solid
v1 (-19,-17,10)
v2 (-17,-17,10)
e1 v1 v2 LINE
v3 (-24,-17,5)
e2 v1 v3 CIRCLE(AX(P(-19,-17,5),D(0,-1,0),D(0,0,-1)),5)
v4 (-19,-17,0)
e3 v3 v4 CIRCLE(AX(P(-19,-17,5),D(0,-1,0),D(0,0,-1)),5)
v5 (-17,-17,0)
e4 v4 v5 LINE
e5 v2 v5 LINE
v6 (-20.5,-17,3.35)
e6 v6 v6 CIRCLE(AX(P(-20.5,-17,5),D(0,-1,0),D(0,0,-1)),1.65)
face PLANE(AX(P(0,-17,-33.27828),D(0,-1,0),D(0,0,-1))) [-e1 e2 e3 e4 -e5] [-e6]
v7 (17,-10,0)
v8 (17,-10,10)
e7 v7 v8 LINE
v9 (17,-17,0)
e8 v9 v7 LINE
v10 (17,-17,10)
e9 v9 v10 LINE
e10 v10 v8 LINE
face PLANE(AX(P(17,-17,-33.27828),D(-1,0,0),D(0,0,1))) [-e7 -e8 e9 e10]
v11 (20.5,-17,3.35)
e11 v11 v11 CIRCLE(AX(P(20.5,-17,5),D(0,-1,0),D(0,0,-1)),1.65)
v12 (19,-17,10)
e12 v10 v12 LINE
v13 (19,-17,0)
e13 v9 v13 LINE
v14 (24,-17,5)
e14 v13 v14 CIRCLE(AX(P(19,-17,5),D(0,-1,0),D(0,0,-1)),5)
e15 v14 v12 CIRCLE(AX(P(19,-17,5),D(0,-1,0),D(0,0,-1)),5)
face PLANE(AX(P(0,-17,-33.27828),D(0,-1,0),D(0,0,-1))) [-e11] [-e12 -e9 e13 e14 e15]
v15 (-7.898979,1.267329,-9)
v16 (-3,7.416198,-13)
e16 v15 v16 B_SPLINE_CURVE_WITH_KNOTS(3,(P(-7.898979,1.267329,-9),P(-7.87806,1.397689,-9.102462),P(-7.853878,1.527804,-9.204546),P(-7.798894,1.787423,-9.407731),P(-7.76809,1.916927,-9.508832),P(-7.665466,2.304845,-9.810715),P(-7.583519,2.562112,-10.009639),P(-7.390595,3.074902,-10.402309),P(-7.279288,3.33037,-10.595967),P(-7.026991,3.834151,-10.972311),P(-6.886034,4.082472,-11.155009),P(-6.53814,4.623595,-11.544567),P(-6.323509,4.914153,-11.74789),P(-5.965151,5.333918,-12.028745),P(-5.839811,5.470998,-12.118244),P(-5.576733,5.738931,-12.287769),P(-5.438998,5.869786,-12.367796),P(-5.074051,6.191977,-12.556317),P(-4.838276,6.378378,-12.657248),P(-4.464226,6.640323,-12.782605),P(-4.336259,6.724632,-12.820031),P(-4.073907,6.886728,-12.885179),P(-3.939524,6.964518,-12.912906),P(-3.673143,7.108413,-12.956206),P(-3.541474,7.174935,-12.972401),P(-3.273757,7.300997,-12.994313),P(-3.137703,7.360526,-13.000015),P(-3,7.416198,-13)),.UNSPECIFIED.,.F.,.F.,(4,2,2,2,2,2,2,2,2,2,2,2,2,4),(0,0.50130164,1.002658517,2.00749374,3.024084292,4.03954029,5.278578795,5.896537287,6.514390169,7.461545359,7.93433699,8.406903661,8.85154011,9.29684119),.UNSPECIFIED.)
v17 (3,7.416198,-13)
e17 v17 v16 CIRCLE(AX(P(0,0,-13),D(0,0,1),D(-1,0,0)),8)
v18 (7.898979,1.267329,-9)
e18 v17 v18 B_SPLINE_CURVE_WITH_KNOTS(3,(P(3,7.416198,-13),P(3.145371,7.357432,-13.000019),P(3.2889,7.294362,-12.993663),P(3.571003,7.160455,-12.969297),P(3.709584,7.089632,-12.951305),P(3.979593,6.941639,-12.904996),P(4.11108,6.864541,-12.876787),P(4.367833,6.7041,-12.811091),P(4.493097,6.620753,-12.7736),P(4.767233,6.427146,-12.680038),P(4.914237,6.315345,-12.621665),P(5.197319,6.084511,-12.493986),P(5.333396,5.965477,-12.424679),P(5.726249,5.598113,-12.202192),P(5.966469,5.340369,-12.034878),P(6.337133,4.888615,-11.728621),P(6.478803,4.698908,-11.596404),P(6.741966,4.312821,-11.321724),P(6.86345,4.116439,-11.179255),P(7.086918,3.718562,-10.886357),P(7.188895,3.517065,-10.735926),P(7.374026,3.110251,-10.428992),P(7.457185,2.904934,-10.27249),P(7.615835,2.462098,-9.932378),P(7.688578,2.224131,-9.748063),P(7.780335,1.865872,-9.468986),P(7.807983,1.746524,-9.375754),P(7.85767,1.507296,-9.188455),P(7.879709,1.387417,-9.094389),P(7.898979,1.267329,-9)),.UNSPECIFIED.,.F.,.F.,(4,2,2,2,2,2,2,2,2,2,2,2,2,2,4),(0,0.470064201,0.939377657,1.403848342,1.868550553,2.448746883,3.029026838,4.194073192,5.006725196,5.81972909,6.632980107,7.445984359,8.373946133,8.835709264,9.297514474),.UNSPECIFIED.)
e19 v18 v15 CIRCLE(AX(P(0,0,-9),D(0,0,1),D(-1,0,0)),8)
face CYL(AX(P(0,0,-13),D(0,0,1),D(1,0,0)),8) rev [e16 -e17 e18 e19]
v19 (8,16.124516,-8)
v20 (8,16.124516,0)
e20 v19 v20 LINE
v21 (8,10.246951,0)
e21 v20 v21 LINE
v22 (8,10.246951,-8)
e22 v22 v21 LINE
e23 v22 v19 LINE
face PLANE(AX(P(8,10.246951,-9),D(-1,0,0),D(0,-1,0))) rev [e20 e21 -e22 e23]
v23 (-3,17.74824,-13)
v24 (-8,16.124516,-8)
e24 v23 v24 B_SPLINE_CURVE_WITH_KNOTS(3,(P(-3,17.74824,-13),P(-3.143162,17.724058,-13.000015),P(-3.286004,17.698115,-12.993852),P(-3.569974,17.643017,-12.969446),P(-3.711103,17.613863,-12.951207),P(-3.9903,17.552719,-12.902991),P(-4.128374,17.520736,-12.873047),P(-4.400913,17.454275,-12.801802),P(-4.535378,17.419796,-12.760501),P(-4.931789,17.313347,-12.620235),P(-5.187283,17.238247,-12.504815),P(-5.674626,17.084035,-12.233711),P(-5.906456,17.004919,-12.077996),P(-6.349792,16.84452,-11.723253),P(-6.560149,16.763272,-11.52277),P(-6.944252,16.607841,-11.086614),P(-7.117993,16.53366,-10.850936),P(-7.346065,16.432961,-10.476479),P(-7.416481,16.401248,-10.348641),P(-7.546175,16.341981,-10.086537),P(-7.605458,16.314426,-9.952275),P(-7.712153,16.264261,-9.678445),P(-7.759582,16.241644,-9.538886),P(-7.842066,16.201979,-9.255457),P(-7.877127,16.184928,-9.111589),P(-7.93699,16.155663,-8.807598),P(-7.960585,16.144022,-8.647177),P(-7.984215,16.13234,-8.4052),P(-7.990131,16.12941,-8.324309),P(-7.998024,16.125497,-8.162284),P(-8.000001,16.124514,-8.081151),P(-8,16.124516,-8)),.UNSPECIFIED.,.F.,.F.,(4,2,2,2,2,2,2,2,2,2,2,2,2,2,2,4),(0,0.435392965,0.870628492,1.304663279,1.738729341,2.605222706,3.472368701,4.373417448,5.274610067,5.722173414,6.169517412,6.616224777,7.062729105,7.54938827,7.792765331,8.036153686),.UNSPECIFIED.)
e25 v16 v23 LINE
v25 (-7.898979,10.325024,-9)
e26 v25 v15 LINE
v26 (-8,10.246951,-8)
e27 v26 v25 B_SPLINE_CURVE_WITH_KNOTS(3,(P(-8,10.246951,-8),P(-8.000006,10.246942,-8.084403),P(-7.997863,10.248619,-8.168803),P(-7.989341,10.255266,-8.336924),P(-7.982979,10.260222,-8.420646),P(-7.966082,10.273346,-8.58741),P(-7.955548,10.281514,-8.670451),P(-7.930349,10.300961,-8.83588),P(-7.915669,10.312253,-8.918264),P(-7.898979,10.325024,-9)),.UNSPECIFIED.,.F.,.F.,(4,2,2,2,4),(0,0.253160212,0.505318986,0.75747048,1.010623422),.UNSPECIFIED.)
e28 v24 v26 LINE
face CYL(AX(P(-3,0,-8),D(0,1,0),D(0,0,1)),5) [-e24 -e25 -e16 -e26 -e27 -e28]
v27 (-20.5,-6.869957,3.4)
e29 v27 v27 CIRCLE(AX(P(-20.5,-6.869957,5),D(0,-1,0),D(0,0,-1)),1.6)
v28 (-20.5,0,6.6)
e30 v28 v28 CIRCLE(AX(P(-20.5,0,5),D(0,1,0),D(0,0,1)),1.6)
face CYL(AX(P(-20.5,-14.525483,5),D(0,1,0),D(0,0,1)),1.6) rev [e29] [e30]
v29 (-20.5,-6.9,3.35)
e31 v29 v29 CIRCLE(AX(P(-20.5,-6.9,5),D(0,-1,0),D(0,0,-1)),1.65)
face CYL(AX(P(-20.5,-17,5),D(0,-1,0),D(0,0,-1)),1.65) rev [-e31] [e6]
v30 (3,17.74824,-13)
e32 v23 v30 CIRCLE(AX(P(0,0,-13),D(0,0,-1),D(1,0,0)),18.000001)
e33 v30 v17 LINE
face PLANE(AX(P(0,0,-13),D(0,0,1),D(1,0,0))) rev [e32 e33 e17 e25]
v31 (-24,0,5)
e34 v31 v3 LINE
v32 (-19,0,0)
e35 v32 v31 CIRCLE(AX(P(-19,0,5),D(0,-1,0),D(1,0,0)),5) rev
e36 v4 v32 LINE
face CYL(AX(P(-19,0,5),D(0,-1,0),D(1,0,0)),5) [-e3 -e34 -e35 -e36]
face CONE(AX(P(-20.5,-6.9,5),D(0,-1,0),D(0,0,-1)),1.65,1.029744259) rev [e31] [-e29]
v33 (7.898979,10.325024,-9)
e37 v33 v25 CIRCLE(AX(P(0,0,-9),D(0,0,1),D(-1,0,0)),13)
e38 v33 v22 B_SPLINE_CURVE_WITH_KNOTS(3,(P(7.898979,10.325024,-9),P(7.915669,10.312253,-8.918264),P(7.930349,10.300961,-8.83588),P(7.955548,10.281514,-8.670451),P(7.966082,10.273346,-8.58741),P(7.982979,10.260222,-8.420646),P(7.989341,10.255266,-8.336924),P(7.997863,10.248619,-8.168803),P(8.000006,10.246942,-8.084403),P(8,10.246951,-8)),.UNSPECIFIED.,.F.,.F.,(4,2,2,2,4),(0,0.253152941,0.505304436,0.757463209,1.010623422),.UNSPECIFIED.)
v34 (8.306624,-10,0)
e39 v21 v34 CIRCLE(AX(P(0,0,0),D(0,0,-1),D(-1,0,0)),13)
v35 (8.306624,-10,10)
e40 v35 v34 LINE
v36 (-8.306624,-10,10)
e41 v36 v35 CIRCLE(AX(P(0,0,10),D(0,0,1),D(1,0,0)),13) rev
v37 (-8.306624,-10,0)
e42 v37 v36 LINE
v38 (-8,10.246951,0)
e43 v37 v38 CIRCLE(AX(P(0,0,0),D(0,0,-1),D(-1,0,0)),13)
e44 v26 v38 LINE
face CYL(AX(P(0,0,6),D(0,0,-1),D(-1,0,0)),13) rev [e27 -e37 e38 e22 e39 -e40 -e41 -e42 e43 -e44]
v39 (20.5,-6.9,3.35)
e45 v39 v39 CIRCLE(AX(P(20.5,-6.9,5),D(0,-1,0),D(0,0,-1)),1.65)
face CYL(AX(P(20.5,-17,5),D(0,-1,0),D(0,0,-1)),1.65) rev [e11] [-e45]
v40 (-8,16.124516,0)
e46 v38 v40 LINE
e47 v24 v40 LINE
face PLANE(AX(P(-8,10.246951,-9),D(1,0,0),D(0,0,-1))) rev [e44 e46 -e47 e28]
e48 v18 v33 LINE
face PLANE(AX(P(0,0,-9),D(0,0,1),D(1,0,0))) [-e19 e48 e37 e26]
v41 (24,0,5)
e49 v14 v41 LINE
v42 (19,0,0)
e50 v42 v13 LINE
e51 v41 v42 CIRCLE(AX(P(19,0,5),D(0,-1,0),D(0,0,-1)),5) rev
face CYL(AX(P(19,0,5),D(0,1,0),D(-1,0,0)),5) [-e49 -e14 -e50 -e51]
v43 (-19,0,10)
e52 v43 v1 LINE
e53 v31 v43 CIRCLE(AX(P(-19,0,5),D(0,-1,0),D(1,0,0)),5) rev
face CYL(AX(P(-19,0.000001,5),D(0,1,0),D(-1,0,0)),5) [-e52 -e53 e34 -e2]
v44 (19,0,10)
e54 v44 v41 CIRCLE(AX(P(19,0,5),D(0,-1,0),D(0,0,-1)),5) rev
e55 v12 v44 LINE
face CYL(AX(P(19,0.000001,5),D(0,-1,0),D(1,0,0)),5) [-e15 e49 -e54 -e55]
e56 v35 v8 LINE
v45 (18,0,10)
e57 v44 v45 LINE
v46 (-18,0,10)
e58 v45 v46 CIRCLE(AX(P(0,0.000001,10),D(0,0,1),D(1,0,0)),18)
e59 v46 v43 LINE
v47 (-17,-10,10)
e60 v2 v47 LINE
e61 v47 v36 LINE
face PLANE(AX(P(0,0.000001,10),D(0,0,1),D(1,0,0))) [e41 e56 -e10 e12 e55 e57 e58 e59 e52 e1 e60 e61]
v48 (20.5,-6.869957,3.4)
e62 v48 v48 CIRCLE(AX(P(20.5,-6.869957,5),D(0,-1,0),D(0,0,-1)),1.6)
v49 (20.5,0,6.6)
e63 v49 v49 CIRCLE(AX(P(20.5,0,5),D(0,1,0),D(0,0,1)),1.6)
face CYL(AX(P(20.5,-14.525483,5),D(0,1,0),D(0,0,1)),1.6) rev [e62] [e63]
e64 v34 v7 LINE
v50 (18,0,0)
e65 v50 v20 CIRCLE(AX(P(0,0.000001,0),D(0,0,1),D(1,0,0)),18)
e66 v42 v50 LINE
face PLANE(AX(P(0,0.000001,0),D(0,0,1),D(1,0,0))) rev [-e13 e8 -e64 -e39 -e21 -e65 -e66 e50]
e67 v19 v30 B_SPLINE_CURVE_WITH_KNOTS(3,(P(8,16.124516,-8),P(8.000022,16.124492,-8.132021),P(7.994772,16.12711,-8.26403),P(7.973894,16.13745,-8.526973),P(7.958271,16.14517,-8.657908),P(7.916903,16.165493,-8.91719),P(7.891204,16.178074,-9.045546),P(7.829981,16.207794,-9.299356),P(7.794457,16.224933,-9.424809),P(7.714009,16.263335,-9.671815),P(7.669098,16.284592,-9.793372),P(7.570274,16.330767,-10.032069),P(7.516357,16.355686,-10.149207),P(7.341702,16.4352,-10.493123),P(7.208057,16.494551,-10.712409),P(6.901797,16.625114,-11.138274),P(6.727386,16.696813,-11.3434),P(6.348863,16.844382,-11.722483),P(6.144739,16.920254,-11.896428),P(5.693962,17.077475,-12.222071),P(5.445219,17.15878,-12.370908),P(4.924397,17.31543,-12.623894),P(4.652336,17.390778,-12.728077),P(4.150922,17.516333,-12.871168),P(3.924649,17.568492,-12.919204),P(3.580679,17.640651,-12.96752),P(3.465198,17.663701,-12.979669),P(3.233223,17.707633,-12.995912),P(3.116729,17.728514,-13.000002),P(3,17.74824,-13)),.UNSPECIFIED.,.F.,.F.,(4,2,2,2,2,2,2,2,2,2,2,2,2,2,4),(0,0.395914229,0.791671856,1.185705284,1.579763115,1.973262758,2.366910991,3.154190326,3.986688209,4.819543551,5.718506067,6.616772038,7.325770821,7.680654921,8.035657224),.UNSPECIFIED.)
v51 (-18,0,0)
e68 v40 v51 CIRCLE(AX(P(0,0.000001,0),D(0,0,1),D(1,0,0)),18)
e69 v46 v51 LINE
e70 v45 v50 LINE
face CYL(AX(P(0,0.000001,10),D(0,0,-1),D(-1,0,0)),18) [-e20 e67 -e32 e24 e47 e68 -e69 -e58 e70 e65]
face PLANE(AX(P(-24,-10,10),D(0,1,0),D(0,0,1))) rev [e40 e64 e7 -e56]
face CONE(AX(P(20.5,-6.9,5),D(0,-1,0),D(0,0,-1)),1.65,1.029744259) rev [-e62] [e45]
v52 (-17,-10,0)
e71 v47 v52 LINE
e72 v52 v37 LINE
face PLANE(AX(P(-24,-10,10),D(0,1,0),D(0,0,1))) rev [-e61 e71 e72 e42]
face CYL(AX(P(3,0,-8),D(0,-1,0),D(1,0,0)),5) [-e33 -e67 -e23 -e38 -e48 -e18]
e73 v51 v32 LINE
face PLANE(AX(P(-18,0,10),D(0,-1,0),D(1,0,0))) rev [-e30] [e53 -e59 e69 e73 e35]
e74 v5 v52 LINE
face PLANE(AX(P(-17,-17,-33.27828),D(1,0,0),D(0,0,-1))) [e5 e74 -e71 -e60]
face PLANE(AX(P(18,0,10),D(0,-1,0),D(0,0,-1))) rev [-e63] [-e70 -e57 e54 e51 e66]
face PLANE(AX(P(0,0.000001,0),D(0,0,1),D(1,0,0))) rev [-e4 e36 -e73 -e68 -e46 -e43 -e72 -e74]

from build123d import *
from build123d.topology import SkipClean

# Parameters (mm, degrees)
SKETCH1_R             = 6
EXTRUDE1_DEPTH        = 10
SKETCH2_R             = 13
CUT_EXTRUDE1_DEPTH    = 6
SKETCH3_R             = 1.6
CUT_EXTRUDE2_DEPTH    = 10
SKETCH4_W             = 7
SKETCH4_H             = 10
SKETCH4_R             = 1.6
EXTRUDE3_DEPTH        = 7
FILLET2_R             = 5
SKETCH5_R             = 13
EXTRUDE4_DEPTH        = 4
EXTRUDE5_START        = 9
EXTRUDE5_DEPTH        = 9
EXTRUDE6_START        = 4
EXTRUDE6_DEPTH        = 4
FILLET3_R             = 5
M4_TAPPED_HOLE1_D     = 3.3
M4_TAPPED_HOLE1_DEPTH = 10.1
M4_TAPPED_HOLE1_TIP   = 0.991420021


# Some blends are built 0.0001 mm under size
with BuildPart() as part:
    # Sketch1 → Extrude1 (new body)
    with BuildSketch(Plane.XY):
        with BuildLine():
            Line((-18, 0), (-24, 0))
            Line((-24, 0), (-24, -10))
            Line((-24, -10), (24, -10))
            Line((24, -10), (24, 0))
            Line((24, 0), (18, 0))
            ThreePointArc((18, 0), (0, 18.000000653), (-18, 0))
        make_face()
        with Locations((0, 6.53e-07)):
            Circle(SKETCH1_R, mode=Mode.SUBTRACT)
    extrude(amount=EXTRUDE1_DEPTH)

    # Sketch2 → Cut-Extrude1 (cut)
    with BuildSketch(Plane(origin=(0, 0, 0), x_dir=(-1, 0, 0), z_dir=(0, 0, -1))):
        Circle(SKETCH2_R)
    extrude(amount=-CUT_EXTRUDE1_DEPTH, mode=Mode.SUBTRACT)

    # Sketch3 → Cut-Extrude2 (cut)
    with BuildSketch(Plane(origin=(0, 0, 0), x_dir=(-1, 0, 0), z_dir=(0, 1, 0))):
        with Locations(Location((-20.5, 5, 0), (0, 0, 90))):
            Circle(SKETCH3_R)
        with Locations(Location((20.5, 5, 0), (0, 0, 90))):
            Circle(SKETCH3_R)
    extrude(amount=-CUT_EXTRUDE2_DEPTH, mode=Mode.SUBTRACT)

    # Sketch4 → Extrude3 (add)
    # profile 1 of 2: a face of its own
    with SkipClean():  # the faces are left unmerged after this step: merging them gives an invalid solid
        with BuildSketch(Plane.XZ.offset(10)):
            with Locations((-20.5, 5)):
                Rectangle(SKETCH4_W, SKETCH4_H)
            with Locations((-20.5, 5)):
                Circle(SKETCH4_R, mode=Mode.SUBTRACT)
        # profile 2 of 2: a face of its own
        with BuildSketch(Plane.XZ.offset(10)):
            with Locations((20.5, 5)):
                Rectangle(SKETCH4_W, SKETCH4_H)
            with Locations((20.5, 5)):
                Circle(SKETCH4_R, mode=Mode.SUBTRACT)
        extrude(amount=EXTRUDE3_DEPTH)
    add(part.part.scale(1), mode=Mode.REPLACE)  # the faces are merged on a copy

    # Fillet2
    fillet2_edges = [part.edges().sort_by_distance(p)[0] for p in [
        (24, -8.5, 10),
        (24, -8.5, 0),
        (-24, -5, 10),
        (-24, -5, 0),
    ]]
    fillet(fillet2_edges, radius=FILLET2_R - 0.0001)  # a hair under: the kernel refuses the full size

    # Sketch5 → Extrude4 (cut)
    with BuildSketch(Plane(origin=(0, 0, 6), x_dir=(-1, 0, 0), z_dir=(0, 0, -1))):
        Circle(SKETCH5_R)
    extrude(amount=-EXTRUDE4_DEPTH, mode=Mode.SUBTRACT)

    # Sketch6 → Extrude5 (add)
    with BuildSketch(Plane(origin=(0, 0, 0), x_dir=(-1, 0, 0), z_dir=(0, 0, -1)).offset(EXTRUDE5_START)):
        with BuildLine():
            Line((-8, 10.246950766), (-8, 16.12451615))
            ThreePointArc((-8, 16.12451615), (0, 18.000000585), (8, 16.12451615))
            Line((8, 16.12451615), (8, 10.246950766))
            ThreePointArc((8, 10.246950766), (0, 13), (-8, 10.246950766))
        make_face()
    extrude(amount=-EXTRUDE5_DEPTH)

    # Sketch7 → Extrude6 (add)
    with BuildSketch(Plane(origin=(0, 0, -9), x_dir=(-1, 0, 0), z_dir=(0, 0, -1)).offset(EXTRUDE6_START)):
        with BuildLine():
            Line((8, 16.12451615), (8, 0))
            ThreePointArc((8, 0), (0, 8), (-8, 0))
            Line((-8, 0), (-8, 16.12451615))
            ThreePointArc((-8, 16.12451615), (0, 18.000000585), (8, 16.12451615))
        make_face()
    extrude(amount=-EXTRUDE6_DEPTH)

    # Fillet3
    # the kernel refuses this fillet: 5 mm, written as the material it takes off along each edge
    with BuildSketch(Plane(origin=(-8, 28.62451615, -13), x_dir=(0, 0, 1), z_dir=(0, -1, 0)), Plane(origin=(8, -12.5, -13), x_dir=(0, 0, 1), z_dir=(0, 1, 0))) as fillet3_piece_1:
        with BuildLine():
            CenterArc((FILLET3_R, -FILLET3_R), FILLET3_R, 90, 90)
            Line((0, -FILLET3_R), (0, 0))
            Line((0, 0), (FILLET3_R, 0))
        make_face()
    extrude(amount=41.12451615, mode=Mode.SUBTRACT)

    # M4 Tapped Hole1
    with Locations(Plane(origin=(-20.5, -17, 5), x_dir=(0, 0, -1), z_dir=(0, -1, 0))):
        with Locations((0, 0), (0, 41)):
            Hole(M4_TAPPED_HOLE1_D / 2, depth=M4_TAPPED_HOLE1_DEPTH)
            with Locations((0, 0, -(M4_TAPPED_HOLE1_DEPTH + M4_TAPPED_HOLE1_TIP / 2))):  # 118° drill point
                Cone(0, M4_TAPPED_HOLE1_D / 2, M4_TAPPED_HOLE1_TIP, mode=Mode.SUBTRACT)


solid = part.part
